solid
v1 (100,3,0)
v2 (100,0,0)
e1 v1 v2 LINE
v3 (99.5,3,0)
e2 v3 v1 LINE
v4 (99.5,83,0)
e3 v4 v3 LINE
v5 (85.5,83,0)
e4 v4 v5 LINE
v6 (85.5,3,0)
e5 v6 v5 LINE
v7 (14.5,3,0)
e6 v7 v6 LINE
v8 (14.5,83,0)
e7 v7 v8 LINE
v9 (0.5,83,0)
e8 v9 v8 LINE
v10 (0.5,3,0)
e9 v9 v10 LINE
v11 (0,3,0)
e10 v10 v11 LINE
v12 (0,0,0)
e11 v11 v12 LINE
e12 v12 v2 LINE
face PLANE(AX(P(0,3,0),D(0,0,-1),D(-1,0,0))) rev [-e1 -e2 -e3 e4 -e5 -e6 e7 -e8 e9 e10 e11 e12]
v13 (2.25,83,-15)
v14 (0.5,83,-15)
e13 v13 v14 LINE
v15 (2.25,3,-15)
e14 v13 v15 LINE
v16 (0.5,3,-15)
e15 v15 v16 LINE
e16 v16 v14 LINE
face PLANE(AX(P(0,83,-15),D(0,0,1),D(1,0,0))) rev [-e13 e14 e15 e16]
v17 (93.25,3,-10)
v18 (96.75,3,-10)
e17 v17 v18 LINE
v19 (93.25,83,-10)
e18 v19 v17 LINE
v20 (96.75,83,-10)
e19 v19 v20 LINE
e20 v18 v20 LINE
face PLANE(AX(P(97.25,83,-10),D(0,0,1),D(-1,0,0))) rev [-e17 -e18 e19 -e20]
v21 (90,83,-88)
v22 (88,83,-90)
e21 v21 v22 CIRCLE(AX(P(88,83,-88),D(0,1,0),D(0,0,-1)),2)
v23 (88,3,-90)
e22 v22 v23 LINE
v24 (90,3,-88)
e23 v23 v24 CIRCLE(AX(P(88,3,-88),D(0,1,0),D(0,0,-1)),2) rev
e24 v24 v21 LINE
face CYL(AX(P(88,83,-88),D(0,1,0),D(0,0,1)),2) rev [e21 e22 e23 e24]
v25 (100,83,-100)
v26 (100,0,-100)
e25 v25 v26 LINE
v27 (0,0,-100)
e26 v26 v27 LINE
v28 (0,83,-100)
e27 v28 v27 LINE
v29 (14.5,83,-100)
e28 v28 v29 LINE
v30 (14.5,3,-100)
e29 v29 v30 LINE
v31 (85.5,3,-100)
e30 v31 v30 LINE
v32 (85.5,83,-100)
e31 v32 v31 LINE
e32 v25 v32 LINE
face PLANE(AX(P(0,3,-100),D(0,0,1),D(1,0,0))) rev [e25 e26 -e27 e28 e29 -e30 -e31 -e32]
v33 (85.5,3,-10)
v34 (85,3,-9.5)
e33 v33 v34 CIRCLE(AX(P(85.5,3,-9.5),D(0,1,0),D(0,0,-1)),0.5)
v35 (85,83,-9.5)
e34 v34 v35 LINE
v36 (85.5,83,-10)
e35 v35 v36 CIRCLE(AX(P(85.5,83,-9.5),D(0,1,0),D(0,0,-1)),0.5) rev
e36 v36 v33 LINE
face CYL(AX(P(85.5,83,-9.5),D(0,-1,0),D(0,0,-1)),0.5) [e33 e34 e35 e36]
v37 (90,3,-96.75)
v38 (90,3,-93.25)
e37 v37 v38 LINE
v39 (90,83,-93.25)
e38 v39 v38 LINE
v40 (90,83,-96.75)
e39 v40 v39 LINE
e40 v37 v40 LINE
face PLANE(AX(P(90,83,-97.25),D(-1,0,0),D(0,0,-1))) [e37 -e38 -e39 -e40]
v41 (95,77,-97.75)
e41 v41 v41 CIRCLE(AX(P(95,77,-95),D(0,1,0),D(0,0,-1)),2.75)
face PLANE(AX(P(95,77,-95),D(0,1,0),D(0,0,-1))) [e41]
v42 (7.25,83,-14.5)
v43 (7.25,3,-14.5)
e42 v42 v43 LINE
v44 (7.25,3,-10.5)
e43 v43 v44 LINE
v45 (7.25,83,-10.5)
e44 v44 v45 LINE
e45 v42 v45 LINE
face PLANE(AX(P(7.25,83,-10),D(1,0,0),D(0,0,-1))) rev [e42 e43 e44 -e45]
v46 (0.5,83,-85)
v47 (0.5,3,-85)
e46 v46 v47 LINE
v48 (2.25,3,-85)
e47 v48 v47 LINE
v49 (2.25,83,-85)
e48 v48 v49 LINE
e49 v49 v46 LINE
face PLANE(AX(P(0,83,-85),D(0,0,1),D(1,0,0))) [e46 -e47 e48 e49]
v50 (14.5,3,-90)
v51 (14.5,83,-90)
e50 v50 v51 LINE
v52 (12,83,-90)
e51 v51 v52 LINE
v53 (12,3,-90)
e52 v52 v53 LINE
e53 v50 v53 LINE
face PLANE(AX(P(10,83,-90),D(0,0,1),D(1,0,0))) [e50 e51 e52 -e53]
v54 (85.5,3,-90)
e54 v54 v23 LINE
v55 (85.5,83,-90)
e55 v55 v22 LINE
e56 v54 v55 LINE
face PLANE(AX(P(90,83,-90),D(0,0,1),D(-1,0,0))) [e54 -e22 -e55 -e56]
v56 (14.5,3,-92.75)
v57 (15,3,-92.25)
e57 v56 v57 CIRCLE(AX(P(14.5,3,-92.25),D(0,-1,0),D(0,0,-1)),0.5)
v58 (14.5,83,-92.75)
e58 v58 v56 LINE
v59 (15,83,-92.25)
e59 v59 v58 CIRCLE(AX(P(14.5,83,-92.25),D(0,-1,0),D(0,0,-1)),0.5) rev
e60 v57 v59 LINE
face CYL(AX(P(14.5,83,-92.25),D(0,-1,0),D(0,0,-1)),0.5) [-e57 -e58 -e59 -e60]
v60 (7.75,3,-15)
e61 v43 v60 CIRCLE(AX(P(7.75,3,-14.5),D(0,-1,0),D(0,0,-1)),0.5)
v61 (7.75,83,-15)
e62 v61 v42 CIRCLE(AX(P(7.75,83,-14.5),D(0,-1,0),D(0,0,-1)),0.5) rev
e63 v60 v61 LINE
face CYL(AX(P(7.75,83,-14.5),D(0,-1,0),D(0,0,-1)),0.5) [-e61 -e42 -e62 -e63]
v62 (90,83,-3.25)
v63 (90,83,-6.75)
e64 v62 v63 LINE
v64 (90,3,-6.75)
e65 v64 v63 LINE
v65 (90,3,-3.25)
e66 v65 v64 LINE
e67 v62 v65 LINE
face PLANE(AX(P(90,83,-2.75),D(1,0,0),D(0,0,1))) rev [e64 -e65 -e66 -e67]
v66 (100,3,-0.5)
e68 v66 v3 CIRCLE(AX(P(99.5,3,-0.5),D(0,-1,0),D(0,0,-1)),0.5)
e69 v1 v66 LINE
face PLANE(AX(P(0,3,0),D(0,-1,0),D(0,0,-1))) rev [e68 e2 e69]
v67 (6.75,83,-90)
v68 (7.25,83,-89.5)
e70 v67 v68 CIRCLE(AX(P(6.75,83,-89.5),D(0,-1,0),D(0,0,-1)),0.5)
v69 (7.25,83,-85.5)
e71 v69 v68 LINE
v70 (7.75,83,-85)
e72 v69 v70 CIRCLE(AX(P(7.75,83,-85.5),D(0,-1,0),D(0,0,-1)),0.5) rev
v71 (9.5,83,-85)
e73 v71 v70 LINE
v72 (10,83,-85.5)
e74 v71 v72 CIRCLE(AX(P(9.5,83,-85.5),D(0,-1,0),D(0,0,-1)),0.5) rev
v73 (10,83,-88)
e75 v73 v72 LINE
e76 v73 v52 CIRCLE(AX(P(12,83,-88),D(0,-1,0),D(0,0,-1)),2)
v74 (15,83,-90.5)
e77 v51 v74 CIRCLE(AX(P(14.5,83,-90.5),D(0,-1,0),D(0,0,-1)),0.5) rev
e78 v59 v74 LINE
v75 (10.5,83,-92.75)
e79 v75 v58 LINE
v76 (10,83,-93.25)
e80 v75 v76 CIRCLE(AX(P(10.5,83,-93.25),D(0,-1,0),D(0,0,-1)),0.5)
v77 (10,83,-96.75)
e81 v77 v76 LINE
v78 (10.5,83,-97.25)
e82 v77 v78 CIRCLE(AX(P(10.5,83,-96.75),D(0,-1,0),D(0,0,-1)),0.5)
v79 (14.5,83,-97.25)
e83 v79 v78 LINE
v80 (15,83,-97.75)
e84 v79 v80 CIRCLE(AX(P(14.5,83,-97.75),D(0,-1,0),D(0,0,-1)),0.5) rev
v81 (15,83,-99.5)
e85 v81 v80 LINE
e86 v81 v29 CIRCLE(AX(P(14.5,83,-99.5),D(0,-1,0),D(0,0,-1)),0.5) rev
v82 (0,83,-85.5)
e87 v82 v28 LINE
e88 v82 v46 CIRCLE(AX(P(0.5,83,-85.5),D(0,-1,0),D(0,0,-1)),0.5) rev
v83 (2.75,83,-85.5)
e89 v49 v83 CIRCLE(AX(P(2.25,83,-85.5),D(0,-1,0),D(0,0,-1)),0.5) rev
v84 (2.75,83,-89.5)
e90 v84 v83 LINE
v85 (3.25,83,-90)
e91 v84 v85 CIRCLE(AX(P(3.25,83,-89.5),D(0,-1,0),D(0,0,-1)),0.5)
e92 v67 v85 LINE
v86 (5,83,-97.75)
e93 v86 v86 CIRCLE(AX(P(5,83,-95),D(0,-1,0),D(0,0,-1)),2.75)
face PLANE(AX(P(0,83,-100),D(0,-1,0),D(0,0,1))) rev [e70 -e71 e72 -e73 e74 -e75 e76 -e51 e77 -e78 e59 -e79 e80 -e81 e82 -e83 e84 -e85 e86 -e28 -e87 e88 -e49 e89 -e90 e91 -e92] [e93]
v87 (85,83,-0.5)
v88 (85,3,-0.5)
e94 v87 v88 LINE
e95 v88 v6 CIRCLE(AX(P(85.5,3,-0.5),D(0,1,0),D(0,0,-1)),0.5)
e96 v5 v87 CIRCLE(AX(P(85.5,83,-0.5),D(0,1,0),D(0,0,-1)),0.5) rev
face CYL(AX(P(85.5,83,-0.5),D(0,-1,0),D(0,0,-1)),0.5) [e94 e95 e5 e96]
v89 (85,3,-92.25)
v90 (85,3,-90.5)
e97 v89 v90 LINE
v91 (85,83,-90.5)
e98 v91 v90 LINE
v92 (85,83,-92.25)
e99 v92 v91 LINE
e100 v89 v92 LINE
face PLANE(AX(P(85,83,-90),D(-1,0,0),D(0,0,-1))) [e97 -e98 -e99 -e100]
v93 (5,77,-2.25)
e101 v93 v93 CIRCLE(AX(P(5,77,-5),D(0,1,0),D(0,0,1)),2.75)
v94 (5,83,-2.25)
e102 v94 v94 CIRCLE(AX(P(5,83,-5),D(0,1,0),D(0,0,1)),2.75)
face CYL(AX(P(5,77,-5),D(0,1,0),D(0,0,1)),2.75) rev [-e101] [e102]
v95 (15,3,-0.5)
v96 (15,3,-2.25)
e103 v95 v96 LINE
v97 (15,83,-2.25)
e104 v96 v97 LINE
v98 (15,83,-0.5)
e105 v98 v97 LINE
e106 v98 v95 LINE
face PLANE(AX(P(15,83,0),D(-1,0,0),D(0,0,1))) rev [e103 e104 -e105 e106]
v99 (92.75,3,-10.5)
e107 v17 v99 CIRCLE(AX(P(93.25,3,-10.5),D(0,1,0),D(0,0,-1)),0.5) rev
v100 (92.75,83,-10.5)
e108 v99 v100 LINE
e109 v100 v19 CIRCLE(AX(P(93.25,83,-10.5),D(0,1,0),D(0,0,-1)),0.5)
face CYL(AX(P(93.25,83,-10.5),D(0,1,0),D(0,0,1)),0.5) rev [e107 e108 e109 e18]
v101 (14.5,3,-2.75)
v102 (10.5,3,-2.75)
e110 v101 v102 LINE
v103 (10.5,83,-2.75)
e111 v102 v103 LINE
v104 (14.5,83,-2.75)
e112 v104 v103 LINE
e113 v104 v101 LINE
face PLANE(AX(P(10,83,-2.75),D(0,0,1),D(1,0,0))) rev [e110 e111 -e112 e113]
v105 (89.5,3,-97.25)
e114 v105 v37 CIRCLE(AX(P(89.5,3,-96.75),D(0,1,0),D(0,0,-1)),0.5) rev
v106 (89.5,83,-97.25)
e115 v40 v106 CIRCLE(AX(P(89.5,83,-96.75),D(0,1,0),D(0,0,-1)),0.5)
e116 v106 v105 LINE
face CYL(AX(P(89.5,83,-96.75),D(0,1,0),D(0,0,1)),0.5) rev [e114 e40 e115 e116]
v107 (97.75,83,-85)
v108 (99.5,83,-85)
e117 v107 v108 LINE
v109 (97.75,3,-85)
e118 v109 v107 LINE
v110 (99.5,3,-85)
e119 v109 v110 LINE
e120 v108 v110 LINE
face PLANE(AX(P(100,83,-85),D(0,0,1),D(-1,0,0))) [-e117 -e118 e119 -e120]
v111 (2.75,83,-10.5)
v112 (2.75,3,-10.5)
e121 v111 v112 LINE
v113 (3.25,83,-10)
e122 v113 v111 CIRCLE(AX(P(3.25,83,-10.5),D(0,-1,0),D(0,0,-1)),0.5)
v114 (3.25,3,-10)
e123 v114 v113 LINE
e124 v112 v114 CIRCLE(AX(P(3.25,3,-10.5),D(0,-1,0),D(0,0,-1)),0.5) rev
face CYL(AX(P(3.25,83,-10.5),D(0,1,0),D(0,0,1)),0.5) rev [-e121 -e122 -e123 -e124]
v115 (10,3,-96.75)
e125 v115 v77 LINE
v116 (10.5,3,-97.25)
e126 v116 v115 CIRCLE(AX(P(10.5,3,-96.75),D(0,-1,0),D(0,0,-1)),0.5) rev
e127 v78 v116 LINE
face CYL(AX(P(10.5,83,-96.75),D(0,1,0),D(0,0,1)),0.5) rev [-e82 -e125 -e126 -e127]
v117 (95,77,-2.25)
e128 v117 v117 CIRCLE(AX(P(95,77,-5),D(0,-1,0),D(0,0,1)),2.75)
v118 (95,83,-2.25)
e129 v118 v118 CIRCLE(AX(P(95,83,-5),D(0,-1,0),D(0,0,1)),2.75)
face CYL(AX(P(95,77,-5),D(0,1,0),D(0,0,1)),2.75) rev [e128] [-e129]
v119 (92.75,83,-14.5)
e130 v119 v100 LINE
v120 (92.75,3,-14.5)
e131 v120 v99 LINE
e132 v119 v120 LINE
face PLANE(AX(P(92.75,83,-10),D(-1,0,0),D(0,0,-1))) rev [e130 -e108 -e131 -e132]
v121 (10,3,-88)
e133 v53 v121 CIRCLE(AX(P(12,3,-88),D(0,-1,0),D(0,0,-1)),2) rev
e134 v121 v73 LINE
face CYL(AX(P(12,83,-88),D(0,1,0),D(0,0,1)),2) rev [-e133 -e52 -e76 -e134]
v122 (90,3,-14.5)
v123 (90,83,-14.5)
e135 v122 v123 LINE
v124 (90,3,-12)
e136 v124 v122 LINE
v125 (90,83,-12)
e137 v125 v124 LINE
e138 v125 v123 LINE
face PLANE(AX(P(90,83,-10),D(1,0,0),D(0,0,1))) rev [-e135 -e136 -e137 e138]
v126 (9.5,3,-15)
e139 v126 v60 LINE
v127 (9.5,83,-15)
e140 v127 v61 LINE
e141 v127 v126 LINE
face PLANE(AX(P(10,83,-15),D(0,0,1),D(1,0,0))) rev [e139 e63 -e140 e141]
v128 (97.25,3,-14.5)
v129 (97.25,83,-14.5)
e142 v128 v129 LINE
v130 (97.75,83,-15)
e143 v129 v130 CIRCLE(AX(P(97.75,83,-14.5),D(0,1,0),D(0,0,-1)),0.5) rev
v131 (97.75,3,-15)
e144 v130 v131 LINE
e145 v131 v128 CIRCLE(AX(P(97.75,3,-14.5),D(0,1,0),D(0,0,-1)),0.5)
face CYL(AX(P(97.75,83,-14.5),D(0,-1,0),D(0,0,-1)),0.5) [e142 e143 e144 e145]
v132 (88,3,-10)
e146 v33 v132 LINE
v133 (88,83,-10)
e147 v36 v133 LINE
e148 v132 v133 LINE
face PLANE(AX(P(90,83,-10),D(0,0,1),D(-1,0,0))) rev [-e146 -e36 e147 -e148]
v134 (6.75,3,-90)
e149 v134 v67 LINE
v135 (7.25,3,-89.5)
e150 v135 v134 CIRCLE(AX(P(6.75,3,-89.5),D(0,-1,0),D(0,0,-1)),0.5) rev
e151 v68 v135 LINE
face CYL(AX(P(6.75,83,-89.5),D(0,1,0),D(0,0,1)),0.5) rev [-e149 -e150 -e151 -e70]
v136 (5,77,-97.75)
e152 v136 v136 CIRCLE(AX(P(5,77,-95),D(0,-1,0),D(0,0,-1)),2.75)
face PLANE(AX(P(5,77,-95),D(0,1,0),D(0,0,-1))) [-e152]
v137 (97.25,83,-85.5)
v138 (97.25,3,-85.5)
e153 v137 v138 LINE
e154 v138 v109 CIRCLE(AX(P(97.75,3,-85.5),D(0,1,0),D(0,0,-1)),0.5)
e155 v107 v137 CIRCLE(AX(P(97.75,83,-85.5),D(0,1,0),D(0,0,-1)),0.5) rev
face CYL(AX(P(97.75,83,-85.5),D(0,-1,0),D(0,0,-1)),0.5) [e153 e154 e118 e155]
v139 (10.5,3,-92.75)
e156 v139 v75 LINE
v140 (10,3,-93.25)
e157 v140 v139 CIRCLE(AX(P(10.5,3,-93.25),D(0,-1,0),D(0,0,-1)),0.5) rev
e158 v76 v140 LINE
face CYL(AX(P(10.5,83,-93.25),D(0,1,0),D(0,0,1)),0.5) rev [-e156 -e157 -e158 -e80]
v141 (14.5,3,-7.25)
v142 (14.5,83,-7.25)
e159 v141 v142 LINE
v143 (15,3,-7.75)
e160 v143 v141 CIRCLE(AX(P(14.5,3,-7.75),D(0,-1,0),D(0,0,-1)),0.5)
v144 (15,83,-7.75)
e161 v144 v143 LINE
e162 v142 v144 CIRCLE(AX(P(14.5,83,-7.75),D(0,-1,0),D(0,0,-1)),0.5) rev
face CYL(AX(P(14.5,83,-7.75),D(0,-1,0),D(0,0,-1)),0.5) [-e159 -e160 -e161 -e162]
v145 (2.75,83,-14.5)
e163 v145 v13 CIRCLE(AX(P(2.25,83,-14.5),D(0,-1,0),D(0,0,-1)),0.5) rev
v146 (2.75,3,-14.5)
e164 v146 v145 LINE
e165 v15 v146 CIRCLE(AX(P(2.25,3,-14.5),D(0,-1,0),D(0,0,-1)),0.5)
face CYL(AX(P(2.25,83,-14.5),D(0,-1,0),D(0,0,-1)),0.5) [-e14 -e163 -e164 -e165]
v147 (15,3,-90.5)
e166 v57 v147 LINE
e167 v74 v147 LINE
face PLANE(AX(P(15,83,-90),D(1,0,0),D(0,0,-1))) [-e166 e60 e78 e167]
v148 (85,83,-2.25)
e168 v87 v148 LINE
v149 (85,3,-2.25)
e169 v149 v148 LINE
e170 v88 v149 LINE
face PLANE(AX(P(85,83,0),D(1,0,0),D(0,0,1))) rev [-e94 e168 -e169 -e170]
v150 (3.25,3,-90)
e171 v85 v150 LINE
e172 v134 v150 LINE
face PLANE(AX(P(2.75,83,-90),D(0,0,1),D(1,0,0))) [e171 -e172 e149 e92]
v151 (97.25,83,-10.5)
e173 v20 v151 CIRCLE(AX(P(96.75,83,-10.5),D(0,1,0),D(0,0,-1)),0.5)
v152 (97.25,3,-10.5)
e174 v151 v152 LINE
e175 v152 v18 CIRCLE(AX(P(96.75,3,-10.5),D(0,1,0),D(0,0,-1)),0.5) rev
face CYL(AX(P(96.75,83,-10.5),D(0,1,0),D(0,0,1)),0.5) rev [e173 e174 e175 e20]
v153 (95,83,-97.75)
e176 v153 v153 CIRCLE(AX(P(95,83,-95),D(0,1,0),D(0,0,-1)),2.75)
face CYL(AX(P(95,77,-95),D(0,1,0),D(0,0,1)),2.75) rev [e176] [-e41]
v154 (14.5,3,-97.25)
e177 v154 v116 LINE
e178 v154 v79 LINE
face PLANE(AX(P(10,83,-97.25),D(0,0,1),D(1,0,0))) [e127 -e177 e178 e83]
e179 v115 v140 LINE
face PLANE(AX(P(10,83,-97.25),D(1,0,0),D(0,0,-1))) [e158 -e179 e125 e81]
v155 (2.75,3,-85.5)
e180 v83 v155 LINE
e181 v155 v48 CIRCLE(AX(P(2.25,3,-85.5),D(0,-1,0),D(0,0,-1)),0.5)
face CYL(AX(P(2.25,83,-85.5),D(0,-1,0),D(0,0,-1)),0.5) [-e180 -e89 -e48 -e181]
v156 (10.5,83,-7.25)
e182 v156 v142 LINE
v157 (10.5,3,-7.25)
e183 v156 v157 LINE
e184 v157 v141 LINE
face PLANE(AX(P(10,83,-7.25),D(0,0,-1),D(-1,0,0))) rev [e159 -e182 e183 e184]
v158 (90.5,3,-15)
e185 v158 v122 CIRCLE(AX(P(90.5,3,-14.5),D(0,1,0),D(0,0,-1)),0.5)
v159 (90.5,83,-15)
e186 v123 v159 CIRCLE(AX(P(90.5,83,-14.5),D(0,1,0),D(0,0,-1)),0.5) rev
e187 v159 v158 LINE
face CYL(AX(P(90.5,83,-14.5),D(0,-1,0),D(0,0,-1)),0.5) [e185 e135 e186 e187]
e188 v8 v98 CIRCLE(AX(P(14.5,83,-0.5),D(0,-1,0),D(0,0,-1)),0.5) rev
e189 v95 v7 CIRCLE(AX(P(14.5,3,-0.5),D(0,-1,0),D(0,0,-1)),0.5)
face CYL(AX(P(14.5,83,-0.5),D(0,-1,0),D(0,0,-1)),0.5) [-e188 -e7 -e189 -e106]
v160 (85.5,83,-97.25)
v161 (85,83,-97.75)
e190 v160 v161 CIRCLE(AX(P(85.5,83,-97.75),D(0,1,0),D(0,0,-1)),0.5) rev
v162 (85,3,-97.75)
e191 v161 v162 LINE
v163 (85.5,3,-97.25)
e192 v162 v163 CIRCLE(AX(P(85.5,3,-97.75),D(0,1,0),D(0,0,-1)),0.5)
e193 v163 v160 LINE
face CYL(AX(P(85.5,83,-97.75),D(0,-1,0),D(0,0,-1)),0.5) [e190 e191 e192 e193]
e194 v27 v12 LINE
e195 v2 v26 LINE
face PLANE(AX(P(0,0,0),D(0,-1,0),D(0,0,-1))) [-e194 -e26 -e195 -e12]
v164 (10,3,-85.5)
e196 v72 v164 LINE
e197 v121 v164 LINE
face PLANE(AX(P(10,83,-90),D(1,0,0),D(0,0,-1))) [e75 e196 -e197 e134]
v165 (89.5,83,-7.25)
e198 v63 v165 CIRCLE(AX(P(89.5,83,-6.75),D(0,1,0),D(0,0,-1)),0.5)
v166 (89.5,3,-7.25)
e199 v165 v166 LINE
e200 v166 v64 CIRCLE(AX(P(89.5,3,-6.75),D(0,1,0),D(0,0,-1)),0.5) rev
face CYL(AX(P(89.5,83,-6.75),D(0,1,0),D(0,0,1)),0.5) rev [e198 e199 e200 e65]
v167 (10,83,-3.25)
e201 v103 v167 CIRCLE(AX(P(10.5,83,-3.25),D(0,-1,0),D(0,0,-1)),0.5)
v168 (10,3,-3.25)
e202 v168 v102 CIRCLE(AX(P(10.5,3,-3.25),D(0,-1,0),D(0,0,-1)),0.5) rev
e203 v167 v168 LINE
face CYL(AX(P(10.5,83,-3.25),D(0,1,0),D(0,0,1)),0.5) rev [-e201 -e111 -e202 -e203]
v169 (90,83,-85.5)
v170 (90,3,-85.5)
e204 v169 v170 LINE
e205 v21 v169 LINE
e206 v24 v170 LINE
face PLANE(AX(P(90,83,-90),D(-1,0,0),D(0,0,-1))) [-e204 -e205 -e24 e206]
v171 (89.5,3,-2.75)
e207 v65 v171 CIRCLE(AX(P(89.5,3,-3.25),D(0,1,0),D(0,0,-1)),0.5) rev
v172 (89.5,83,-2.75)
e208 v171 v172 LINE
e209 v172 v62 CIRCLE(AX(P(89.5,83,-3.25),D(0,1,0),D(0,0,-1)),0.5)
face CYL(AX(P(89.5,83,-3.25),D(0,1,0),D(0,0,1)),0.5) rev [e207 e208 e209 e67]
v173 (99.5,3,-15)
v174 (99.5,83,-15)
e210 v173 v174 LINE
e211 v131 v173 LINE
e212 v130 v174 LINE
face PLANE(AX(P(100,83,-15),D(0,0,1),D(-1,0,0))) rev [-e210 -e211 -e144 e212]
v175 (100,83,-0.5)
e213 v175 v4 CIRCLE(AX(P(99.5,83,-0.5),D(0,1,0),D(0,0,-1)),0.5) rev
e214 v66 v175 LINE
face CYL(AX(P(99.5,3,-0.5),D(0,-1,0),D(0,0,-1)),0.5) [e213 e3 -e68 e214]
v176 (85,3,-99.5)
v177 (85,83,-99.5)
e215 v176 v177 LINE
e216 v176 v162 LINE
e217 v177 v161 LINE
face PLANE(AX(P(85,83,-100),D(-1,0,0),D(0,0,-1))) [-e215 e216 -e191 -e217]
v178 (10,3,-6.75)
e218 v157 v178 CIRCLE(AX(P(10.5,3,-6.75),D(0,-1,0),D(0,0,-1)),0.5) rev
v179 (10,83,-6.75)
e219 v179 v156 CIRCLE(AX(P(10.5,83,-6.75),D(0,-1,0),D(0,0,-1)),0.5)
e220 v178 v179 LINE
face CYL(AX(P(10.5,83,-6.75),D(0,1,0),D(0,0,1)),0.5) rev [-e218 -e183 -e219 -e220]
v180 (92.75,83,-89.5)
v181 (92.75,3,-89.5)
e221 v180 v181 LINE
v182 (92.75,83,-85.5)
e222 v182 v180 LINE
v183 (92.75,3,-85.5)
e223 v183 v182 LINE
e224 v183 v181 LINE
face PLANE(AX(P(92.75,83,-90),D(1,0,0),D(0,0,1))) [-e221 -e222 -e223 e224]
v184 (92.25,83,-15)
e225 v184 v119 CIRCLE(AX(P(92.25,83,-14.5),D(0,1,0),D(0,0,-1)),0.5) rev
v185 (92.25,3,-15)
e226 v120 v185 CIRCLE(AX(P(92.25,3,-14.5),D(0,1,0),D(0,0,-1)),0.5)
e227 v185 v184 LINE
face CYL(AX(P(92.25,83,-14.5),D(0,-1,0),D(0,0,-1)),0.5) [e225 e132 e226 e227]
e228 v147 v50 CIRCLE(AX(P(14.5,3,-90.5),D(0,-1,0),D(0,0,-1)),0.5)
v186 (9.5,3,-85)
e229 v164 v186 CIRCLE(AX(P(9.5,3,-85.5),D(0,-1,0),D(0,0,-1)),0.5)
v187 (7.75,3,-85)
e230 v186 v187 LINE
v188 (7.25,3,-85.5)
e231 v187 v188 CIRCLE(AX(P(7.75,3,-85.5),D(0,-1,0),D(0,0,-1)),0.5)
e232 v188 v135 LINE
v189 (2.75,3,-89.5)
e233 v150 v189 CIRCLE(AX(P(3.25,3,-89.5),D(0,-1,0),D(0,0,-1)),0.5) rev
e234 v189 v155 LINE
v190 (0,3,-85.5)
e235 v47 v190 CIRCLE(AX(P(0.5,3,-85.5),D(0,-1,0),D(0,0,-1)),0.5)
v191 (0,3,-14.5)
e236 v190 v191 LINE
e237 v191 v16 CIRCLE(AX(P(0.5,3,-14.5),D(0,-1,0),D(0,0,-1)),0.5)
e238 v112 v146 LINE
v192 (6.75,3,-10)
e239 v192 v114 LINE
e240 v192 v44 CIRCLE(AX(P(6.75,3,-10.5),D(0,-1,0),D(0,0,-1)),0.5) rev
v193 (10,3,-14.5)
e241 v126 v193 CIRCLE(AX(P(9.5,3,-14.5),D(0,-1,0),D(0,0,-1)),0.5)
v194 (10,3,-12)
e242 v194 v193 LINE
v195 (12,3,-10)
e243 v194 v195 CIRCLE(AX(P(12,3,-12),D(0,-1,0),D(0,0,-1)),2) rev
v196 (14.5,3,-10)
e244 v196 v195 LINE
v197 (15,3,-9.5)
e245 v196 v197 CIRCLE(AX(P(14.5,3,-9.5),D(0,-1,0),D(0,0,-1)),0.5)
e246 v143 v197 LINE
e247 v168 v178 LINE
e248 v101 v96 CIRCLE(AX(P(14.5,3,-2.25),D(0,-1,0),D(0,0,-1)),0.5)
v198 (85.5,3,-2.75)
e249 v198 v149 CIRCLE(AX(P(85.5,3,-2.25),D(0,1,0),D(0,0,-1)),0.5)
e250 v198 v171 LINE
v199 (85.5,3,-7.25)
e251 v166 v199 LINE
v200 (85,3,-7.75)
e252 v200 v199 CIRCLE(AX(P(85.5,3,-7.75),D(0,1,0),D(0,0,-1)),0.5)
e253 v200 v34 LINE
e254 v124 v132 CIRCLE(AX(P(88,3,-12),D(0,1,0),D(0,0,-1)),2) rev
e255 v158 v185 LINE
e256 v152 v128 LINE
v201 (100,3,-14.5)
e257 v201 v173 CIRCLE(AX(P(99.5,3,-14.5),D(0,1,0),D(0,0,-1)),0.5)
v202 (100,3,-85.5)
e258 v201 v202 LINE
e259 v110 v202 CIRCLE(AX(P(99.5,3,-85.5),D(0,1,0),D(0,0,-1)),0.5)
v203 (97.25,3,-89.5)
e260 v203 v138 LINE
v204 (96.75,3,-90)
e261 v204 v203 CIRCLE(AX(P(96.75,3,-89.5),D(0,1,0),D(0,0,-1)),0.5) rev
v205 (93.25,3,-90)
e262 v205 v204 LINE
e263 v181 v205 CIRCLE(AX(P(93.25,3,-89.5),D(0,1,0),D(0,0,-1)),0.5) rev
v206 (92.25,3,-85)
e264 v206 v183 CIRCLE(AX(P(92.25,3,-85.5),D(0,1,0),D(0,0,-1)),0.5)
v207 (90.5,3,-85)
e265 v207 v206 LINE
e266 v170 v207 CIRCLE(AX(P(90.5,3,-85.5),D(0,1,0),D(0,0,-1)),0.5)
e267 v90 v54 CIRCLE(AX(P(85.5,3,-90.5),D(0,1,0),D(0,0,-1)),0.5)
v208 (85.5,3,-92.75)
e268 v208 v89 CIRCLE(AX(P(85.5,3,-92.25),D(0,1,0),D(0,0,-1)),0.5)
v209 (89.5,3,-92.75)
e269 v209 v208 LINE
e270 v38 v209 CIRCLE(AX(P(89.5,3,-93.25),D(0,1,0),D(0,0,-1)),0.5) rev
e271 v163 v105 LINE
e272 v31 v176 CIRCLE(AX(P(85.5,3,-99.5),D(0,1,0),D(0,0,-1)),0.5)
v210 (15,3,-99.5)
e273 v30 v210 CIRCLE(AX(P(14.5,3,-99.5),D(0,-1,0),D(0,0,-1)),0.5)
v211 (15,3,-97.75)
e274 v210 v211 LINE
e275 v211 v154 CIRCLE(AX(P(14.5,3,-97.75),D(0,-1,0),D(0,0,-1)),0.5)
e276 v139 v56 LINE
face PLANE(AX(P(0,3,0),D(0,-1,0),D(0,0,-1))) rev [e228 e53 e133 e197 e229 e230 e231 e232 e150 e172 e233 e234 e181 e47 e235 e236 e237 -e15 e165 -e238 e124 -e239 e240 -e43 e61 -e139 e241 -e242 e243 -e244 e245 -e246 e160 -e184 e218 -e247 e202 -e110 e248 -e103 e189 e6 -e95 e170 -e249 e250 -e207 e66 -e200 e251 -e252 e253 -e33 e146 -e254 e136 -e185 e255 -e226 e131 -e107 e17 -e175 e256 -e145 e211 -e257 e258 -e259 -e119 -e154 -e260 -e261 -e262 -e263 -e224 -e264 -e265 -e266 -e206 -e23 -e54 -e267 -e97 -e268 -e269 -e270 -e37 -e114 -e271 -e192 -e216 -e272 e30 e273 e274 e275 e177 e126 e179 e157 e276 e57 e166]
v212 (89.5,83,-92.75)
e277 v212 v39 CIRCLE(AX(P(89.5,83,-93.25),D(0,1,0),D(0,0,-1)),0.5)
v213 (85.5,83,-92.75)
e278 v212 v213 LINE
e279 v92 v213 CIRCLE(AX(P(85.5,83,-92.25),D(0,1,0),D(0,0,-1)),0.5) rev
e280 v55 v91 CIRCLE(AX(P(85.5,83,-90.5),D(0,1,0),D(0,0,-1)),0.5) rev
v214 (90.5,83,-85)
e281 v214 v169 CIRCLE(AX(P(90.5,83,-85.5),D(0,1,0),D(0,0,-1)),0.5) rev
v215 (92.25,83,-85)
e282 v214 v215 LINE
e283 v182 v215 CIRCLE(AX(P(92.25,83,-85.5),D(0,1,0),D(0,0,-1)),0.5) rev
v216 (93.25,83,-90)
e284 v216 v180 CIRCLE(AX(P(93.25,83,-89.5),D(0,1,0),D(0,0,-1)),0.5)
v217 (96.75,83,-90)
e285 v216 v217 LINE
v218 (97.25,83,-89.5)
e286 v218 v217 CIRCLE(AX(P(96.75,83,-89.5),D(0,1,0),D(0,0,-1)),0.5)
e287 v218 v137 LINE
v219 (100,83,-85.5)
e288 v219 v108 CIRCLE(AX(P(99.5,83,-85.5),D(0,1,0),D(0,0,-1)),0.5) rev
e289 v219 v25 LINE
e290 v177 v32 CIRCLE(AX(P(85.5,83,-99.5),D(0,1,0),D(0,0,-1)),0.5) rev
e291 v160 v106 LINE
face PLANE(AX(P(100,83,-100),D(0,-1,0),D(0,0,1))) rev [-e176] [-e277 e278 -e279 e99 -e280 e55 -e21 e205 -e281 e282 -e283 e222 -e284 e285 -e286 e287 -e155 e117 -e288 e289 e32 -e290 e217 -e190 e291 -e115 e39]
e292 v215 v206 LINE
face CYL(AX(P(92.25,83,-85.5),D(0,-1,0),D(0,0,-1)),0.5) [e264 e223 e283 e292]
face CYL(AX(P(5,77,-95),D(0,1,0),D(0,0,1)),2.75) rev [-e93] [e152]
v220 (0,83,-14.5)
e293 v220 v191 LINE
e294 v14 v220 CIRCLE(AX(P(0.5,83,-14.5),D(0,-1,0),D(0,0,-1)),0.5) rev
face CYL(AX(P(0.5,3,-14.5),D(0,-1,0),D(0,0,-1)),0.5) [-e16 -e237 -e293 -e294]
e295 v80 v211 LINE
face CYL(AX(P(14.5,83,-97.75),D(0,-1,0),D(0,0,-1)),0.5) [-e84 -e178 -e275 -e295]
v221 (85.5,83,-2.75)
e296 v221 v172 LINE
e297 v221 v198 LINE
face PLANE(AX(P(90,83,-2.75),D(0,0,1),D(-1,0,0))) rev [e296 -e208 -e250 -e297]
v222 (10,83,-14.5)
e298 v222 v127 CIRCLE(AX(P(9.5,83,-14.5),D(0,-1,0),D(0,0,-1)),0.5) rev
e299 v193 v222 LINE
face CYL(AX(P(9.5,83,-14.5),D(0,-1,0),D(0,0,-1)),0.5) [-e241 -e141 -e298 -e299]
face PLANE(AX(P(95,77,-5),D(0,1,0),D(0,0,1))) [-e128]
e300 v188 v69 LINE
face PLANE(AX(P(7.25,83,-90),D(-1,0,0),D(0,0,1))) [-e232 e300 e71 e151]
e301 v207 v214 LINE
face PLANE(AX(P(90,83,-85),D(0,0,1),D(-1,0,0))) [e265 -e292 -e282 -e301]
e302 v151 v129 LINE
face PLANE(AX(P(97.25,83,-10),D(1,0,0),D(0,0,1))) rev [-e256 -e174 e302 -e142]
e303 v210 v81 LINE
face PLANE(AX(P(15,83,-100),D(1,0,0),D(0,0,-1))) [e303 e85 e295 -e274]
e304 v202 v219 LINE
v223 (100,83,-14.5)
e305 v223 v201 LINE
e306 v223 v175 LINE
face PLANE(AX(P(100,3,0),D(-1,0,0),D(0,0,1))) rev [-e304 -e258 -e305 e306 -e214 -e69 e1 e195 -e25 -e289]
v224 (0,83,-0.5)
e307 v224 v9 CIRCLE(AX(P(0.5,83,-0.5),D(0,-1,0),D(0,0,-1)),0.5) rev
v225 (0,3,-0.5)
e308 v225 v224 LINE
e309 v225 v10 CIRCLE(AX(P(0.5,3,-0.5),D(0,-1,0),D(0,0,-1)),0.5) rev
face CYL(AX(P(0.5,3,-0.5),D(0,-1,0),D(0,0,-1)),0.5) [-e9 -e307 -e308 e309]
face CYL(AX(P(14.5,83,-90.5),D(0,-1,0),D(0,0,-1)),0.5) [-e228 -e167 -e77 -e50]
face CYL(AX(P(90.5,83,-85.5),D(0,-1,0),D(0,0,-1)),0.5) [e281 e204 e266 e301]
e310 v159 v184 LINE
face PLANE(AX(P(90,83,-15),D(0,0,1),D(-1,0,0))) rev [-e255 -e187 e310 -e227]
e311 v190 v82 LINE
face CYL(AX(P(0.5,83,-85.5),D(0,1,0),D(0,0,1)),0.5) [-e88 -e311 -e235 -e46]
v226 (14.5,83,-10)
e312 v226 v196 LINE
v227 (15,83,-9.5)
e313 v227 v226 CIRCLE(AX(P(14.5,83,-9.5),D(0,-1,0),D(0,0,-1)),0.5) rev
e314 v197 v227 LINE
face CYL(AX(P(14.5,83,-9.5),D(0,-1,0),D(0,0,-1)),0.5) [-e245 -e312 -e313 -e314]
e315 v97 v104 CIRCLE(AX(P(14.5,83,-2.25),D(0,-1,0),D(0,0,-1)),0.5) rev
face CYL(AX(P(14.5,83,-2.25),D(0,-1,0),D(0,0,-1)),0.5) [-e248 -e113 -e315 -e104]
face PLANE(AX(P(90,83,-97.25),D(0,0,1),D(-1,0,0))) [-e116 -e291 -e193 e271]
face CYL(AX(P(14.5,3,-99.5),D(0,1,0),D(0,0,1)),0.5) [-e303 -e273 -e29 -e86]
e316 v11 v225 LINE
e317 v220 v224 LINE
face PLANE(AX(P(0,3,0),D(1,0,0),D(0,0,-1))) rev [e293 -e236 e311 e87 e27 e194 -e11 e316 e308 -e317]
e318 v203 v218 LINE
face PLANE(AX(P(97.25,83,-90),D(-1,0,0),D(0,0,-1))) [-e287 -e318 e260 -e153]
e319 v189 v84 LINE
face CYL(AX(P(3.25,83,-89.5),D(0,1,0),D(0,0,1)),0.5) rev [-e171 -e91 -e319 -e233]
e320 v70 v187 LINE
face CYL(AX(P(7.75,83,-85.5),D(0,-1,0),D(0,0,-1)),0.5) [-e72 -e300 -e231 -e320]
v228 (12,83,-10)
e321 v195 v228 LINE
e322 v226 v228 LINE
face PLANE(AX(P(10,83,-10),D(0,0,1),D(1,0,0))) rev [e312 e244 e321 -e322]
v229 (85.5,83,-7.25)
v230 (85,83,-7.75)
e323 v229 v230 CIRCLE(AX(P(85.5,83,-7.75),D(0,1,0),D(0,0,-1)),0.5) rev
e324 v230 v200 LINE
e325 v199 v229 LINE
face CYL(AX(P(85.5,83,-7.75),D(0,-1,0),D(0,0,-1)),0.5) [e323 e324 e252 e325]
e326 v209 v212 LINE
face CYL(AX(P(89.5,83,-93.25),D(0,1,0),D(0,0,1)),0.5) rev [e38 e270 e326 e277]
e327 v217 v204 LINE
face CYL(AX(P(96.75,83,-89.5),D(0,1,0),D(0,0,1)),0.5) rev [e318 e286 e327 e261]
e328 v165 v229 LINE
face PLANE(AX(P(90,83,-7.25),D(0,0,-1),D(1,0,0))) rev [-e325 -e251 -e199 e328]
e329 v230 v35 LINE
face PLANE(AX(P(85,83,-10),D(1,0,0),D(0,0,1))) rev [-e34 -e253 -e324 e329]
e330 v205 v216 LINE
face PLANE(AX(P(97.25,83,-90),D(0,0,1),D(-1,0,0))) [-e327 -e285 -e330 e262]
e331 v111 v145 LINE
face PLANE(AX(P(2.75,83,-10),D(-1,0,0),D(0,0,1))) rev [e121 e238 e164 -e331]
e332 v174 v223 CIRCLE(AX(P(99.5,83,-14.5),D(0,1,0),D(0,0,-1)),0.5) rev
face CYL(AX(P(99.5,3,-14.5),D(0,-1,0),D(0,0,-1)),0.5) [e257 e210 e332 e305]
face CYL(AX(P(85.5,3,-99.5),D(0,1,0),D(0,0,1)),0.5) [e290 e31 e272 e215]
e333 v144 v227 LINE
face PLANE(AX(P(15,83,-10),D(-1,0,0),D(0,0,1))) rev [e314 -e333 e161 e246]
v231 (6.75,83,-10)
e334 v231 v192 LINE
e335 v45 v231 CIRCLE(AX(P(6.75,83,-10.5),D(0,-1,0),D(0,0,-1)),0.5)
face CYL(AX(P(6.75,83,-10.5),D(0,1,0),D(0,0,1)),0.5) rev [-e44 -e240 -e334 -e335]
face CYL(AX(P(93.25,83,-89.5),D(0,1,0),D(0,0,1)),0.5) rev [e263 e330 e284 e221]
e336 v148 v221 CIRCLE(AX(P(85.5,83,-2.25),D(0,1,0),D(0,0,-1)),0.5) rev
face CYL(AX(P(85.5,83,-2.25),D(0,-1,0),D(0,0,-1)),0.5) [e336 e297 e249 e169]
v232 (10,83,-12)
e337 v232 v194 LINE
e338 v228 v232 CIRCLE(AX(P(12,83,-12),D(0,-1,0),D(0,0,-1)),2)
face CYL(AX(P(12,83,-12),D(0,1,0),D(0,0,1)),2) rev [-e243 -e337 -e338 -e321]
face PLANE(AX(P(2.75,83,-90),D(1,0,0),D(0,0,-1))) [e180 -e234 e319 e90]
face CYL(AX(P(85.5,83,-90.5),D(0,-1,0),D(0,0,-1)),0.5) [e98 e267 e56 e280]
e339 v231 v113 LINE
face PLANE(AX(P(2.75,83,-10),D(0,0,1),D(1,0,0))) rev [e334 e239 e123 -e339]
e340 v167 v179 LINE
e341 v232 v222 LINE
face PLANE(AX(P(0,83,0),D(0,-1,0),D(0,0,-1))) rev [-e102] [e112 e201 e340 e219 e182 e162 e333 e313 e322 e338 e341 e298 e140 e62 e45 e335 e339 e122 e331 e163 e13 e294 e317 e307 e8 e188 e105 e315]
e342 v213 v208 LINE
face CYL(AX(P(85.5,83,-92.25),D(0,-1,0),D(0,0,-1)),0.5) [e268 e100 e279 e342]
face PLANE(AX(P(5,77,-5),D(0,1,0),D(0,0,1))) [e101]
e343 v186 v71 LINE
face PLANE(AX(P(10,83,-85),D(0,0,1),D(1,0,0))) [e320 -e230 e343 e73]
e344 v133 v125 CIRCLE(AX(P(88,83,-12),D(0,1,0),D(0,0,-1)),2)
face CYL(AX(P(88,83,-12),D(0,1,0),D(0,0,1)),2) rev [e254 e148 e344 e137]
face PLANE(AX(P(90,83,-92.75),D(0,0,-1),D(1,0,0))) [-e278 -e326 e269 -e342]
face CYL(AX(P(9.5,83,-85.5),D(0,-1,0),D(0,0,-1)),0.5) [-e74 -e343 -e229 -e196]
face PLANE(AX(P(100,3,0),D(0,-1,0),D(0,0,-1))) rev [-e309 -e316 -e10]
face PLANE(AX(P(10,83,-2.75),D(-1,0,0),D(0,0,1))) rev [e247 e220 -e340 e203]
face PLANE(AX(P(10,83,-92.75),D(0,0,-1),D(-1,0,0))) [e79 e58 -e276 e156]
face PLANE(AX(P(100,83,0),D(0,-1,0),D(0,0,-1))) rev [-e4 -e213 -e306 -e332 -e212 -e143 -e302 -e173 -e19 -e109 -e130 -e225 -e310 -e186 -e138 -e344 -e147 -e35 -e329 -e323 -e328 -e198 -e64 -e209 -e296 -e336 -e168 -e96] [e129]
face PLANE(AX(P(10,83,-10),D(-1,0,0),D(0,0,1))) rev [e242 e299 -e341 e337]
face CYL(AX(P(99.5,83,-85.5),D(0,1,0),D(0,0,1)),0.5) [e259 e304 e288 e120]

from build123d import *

# Parameters (mm, degrees)
SKETCH1_W           = 100
SKETCH1_H           = 100
BOSS_EXTRUDE1_DEPTH = 3
BOSS_EXTRUDE2_DEPTH = 80
SKETCH3_R           = 2.75
CUT_EXTRUDE1_DEPTH  = 6
FILLET3_R           = 2
FILLET4_R           = 0.5
MIRROR1_START       = 3
MIRROR1_DEPTH       = 74
MIRROR1_START_2     = 77
MIRROR1_2_OUTLINE_R = 2.75
MIRROR1_2_DEPTH     = 6


# Read off the part's stored shape, not the designer's step: Mirror1
with BuildPart() as part:
    # Sketch1 → Boss-Extrude1 (new body)
    with BuildSketch(Plane(origin=(0, 0, 0), x_dir=(1, 0, 0), z_dir=(0, 1, 0))):
        with Locations((50, 50)):
            Rectangle(SKETCH1_W, SKETCH1_H)
    extrude(amount=BOSS_EXTRUDE1_DEPTH)

    # Sketch2 → Boss-Extrude2 (add)
    with BuildSketch(Plane(origin=(0, 3, 0), x_dir=(1, 0, 0), z_dir=(0, 1, 0))):
        Polygon((0, 0), (10, 0), (15, 0), (15, 2.75), (10, 2.75), (10, 7.25), (15, 7.25), (15, 10), (10, 10), (10, 15), (7.25, 15), (7.25, 10), (2.75, 10), (2.75, 15), (0, 15), (0, 10), align=None)
    extrude(amount=BOSS_EXTRUDE2_DEPTH)

    # Sketch3 → Cut-Extrude1 (cut)
    with BuildSketch(Plane(origin=(0, 83, 0), x_dir=(1, 0, 0), z_dir=(0, 1, 0))):
        with Locations(Location((5, 5, 0), (0, 0, 270))):
            Circle(SKETCH3_R)
    extrude(amount=-CUT_EXTRUDE1_DEPTH, mode=Mode.SUBTRACT)

    # Fillet3
    fillet3_edges = [part.edges().sort_by_distance(p)[0] for p in [
        (10, 43, -10),
    ]]
    fillet(fillet3_edges, radius=FILLET3_R)

    # Fillet4
    fillet4_edges = [part.edges().sort_by_distance(p)[0] for p in [
        (7.25, 43, -10),
        (2.75, 43, -10),
        (10, 43, -7.25),
        (10, 43, -2.75),
        (0, 41.5, 0),
        (0, 43, -15),
        (2.75, 43, -15),
        (7.25, 43, -15),
        (10, 43, -15),
        (15, 43, -10),
        (15, 43, -7.25),
        (15, 43, -2.75),
        (15, 43, 0),
    ]]
    fillet(fillet4_edges, radius=FILLET4_R)

    # Mirror1 outline → Mirror1 (add)
    with BuildSketch(Plane(origin=(0, 0, 0), x_dir=(1, 0, 0), z_dir=(0, 1, 0)).offset(MIRROR1_START)):
        with BuildLine():
            Line((0, 100), (0, 85.5))
            ThreePointArc((0, 85.5), (0.146446609, 85.146446609), (0.5, 85))
            Line((0.5, 85), (2.25, 85))
            ThreePointArc((2.25, 85), (2.603553391, 85.146446609), (2.75, 85.5))
            Line((2.75, 85.5), (2.75, 89.5))
            ThreePointArc((2.75, 89.5), (2.896446609, 89.853553391), (3.25, 90))
            Line((3.25, 90), (6.75, 90))
            ThreePointArc((6.75, 90), (7.103553391, 89.853553391), (7.25, 89.5))
            Line((7.25, 89.5), (7.25, 85.5))
            ThreePointArc((7.25, 85.5), (7.396446609, 85.146446609), (7.75, 85))
            Line((7.75, 85), (9.5, 85))
            ThreePointArc((9.5, 85), (9.853553391, 85.146446609), (10, 85.5))
            Line((10, 85.5), (10, 88))
            ThreePointArc((10, 88), (10.585786438, 89.414213562), (12, 90))
            Line((12, 90), (14.5, 90))
            ThreePointArc((14.5, 90), (14.853553391, 90.146446609), (15, 90.5))
            Line((15, 90.5), (15, 92.25))
            ThreePointArc((15, 92.25), (14.853553391, 92.603553391), (14.5, 92.75))
            Line((14.5, 92.75), (10.5, 92.75))
            ThreePointArc((10.5, 92.75), (10.146446609, 92.896446609), (10, 93.25))
            Line((10, 93.25), (10, 96.75))
            ThreePointArc((10, 96.75), (10.146446609, 97.103553391), (10.5, 97.25))
            Line((10.5, 97.25), (14.5, 97.25))
            ThreePointArc((14.5, 97.25), (14.853553391, 97.396446609), (15, 97.75))
            Line((15, 97.75), (15, 99.5))
            ThreePointArc((15, 99.5), (14.853553391, 99.853553391), (14.5, 100))
            Line((14.5, 100), (0, 100))
        make_face()
    extrude(amount=MIRROR1_DEPTH)

    # Mirror1 2 outline → Mirror1 2 (add)
    with BuildSketch(Plane(origin=(0, 0, 0), x_dir=(1, 0, 0), z_dir=(0, 1, 0)).offset(MIRROR1_START_2)):
        with BuildLine():
            Line((0, 100), (0, 85.5))
            ThreePointArc((0, 85.5), (0.146446609, 85.146446609), (0.5, 85))
            Line((0.5, 85), (2.25, 85))
            ThreePointArc((2.25, 85), (2.603553391, 85.146446609), (2.75, 85.5))
            Line((2.75, 85.5), (2.75, 89.5))
            ThreePointArc((2.75, 89.5), (2.896446609, 89.853553391), (3.25, 90))
            Line((3.25, 90), (6.75, 90))
            ThreePointArc((6.75, 90), (7.103553391, 89.853553391), (7.25, 89.5))
            Line((7.25, 89.5), (7.25, 85.5))
            ThreePointArc((7.25, 85.5), (7.396446609, 85.146446609), (7.75, 85))
            Line((7.75, 85), (9.5, 85))
            ThreePointArc((9.5, 85), (9.853553391, 85.146446609), (10, 85.5))
            Line((10, 85.5), (10, 88))
            ThreePointArc((10, 88), (10.585786438, 89.414213562), (12, 90))
            Line((12, 90), (14.5, 90))
            ThreePointArc((14.5, 90), (14.853553391, 90.146446609), (15, 90.5))
            Line((15, 90.5), (15, 92.25))
            ThreePointArc((15, 92.25), (14.853553391, 92.603553391), (14.5, 92.75))
            Line((14.5, 92.75), (10.5, 92.75))
            ThreePointArc((10.5, 92.75), (10.146446609, 92.896446609), (10, 93.25))
            Line((10, 93.25), (10, 96.75))
            ThreePointArc((10, 96.75), (10.146446609, 97.103553391), (10.5, 97.25))
            Line((10.5, 97.25), (14.5, 97.25))
            ThreePointArc((14.5, 97.25), (14.853553391, 97.396446609), (15, 97.75))
            Line((15, 97.75), (15, 99.5))
            ThreePointArc((15, 99.5), (14.853553391, 99.853553391), (14.5, 100))
            Line((14.5, 100), (0, 100))
        make_face()
        with Locations((5, 95)):
            Circle(MIRROR1_2_OUTLINE_R, mode=Mode.SUBTRACT)
    extrude(amount=MIRROR1_2_DEPTH)

    # Mirror2: part across plane


with BuildPart() as part_1:
    add(part.part)
    add(part.part.mirror(Plane(origin=(50, 0, 0), x_dir=(0, 0, 1), z_dir=(1, 0, 0))))


solid = part_1.part
